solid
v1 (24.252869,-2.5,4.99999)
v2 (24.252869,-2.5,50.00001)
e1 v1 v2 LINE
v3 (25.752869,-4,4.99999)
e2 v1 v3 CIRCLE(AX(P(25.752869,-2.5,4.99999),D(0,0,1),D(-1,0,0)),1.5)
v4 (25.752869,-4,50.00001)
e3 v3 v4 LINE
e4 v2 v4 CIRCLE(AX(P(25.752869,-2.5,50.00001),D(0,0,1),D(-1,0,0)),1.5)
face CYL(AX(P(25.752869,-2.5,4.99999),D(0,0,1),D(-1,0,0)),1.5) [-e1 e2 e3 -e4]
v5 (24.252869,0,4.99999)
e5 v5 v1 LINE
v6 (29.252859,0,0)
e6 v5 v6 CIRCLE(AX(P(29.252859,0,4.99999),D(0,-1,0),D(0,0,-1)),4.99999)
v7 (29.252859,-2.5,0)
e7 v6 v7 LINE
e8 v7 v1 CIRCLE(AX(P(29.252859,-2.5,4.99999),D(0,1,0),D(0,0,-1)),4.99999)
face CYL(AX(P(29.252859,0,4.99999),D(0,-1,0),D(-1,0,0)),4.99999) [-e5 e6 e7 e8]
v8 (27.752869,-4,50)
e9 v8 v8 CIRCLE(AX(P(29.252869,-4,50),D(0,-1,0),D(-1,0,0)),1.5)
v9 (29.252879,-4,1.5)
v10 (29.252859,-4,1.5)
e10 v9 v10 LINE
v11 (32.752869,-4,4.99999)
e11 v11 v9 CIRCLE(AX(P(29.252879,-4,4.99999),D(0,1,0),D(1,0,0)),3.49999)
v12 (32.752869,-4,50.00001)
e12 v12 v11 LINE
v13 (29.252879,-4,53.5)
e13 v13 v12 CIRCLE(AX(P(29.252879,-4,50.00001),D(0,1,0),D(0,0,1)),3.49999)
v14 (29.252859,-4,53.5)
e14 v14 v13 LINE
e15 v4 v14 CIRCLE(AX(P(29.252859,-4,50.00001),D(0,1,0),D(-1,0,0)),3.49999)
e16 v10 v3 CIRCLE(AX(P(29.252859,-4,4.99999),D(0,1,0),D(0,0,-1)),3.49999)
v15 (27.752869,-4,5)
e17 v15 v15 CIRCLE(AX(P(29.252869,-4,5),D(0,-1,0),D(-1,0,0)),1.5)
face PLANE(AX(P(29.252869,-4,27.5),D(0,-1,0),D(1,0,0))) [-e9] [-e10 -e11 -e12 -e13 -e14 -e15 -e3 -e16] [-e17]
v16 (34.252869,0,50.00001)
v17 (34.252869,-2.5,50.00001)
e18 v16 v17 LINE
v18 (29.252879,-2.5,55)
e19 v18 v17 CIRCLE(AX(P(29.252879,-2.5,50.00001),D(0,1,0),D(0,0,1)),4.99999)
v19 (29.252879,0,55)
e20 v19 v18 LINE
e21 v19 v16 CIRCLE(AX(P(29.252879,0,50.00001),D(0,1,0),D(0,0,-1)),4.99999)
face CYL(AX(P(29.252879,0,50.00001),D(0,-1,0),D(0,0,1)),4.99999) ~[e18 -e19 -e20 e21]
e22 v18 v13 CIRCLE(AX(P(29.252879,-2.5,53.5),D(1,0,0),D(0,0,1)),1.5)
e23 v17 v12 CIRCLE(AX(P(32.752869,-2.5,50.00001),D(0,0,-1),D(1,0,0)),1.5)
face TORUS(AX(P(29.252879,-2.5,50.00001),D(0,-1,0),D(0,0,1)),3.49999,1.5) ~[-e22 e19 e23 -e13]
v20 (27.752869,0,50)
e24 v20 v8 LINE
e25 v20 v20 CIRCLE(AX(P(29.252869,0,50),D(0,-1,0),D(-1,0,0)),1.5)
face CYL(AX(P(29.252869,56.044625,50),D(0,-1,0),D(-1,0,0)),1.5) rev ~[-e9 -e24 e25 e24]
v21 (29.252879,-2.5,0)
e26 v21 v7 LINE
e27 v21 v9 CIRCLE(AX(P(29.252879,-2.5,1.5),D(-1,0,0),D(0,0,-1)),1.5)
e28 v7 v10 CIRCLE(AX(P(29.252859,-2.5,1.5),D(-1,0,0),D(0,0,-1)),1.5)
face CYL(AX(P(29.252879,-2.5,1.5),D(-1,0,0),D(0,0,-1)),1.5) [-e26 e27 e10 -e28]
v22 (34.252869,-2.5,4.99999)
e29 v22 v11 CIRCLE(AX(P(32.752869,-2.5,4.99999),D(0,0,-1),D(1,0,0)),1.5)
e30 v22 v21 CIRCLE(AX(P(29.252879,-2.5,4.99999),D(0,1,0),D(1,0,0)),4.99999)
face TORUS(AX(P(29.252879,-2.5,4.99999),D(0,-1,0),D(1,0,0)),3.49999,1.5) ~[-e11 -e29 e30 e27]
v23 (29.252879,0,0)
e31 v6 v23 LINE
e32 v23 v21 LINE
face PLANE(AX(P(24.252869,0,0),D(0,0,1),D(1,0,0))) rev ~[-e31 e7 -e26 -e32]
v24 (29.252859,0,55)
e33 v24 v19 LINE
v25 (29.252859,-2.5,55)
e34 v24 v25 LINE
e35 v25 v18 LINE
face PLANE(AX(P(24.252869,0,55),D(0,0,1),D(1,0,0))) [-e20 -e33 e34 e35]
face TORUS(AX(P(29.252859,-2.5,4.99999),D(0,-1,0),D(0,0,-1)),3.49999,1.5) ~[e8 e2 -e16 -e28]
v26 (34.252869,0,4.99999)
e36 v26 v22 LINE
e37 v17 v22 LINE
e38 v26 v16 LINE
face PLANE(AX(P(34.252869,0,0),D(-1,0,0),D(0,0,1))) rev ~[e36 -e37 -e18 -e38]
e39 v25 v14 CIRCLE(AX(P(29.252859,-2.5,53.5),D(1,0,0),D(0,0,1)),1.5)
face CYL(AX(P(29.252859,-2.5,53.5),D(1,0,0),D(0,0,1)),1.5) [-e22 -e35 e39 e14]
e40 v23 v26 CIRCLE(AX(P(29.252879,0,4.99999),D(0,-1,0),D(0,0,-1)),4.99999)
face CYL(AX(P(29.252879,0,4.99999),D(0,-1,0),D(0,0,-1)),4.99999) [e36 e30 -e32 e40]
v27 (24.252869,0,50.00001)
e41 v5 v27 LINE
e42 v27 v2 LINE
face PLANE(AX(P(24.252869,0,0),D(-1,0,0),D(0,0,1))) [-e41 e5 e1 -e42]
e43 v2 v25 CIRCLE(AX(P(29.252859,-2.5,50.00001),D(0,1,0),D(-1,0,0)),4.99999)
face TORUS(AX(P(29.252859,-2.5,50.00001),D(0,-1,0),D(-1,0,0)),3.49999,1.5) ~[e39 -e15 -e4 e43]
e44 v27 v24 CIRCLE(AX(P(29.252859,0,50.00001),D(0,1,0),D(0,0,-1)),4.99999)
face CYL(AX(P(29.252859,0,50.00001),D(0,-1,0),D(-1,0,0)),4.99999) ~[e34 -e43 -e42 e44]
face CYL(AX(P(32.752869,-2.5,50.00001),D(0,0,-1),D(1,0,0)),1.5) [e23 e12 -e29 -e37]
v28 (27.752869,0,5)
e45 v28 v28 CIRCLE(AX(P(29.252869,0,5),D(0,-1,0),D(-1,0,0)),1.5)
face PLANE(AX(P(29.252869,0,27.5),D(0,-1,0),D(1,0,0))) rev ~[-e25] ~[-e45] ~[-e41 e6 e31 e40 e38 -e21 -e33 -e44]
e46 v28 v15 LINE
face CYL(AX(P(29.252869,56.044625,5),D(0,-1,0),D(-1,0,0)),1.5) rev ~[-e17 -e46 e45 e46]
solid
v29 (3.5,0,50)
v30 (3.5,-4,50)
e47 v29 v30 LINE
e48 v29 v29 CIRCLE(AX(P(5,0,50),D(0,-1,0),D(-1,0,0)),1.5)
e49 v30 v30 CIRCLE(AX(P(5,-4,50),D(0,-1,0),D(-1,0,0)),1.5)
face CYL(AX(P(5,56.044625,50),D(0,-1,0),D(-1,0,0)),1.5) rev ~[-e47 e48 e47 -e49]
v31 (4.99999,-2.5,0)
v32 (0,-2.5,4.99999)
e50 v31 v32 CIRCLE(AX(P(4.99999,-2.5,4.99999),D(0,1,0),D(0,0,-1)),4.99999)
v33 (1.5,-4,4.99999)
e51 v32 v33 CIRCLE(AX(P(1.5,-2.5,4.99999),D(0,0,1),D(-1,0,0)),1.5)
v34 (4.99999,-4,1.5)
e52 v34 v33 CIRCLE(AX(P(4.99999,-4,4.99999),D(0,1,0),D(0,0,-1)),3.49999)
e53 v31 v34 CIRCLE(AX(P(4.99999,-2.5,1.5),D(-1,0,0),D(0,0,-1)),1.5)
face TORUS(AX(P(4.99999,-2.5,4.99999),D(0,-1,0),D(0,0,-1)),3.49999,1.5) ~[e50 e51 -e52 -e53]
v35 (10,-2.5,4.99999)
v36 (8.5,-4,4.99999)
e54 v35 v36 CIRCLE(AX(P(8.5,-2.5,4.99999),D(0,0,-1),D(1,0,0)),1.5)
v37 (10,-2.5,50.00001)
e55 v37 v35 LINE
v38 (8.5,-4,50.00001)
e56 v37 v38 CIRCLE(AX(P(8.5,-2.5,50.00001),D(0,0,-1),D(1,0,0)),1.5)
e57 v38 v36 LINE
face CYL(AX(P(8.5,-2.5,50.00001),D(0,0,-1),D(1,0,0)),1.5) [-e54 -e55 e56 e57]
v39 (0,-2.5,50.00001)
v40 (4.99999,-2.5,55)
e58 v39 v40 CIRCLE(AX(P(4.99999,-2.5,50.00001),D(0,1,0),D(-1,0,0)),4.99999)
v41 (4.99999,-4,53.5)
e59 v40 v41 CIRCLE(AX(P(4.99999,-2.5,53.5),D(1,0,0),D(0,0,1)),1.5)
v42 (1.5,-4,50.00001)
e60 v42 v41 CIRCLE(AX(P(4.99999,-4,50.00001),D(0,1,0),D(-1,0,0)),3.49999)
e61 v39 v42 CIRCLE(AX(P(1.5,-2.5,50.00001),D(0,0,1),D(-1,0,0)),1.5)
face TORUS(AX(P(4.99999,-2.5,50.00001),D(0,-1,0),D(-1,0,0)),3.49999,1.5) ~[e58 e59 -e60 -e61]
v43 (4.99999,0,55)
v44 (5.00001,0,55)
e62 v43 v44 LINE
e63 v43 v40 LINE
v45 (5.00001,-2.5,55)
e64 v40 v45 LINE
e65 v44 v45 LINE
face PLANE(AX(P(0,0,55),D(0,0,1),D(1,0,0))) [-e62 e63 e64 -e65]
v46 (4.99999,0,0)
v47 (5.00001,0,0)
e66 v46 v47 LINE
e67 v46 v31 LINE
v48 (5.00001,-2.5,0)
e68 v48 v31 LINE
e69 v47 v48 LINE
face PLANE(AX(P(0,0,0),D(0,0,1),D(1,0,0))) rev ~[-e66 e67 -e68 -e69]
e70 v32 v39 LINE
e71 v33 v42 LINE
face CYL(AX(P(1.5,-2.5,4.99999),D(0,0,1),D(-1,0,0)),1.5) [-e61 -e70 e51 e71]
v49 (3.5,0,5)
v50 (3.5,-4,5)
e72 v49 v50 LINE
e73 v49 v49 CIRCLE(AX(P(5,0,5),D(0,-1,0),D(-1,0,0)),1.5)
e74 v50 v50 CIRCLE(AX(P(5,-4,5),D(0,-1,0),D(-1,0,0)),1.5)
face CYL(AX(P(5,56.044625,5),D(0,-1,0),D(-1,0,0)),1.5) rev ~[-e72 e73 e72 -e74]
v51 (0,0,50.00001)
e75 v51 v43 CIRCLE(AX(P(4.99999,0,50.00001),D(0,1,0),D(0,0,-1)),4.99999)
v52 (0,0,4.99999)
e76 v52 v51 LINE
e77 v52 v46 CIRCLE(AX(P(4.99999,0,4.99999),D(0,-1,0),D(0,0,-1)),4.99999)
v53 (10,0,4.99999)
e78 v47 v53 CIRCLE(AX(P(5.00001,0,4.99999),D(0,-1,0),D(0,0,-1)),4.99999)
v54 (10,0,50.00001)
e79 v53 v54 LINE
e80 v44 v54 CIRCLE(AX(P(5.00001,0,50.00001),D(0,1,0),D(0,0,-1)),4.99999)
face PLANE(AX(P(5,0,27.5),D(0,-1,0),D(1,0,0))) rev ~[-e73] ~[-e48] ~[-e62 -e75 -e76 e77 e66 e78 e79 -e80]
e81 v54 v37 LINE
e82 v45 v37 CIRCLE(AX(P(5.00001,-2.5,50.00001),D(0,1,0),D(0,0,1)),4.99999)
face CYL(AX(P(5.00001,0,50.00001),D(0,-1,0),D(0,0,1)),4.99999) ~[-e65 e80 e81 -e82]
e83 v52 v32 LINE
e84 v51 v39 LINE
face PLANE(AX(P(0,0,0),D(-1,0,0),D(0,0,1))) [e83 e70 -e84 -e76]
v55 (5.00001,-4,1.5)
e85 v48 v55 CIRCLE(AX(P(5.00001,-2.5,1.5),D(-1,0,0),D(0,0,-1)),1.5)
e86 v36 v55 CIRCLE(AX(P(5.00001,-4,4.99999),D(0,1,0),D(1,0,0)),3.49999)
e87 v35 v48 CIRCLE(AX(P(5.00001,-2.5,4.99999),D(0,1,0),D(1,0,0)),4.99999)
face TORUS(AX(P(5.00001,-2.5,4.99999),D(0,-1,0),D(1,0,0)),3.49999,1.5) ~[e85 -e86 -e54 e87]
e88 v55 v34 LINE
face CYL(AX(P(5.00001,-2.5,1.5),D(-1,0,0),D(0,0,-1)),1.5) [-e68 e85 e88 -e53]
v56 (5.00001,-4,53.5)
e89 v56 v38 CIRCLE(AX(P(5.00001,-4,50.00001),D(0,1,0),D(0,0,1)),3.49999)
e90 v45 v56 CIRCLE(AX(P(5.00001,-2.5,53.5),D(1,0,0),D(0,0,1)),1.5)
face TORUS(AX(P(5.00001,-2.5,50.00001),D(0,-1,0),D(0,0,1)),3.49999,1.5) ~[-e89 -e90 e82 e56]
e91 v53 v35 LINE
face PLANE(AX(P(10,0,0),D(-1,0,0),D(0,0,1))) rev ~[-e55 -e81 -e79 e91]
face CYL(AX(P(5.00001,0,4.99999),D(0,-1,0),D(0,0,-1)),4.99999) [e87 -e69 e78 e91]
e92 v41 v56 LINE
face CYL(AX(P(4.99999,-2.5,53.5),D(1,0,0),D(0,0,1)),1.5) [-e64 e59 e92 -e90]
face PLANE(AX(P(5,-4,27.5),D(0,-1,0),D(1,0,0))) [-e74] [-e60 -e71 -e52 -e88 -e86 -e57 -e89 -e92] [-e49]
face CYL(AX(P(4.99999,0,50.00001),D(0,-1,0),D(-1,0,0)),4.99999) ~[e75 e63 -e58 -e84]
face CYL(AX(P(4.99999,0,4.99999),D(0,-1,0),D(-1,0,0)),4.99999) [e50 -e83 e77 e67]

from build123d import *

# Parameters (mm, degrees)
F0_W     = 10
F0_H     = 55
F1_DEPTH = 4
F3_D     = 3
F3_2_D   = 3
F4_R     = 4.99999
F4_2_R   = 4.99999
F5_R     = 1.5
F5_2_R   = 1.5


# Not quite as in the source:
# - a fillet or chamfer is up to 0.001 mm smaller than in the source, because OpenCascade refuses the exact size


with BuildPart() as f1:
    # F0 (on Front) → F1 (new body)
    with BuildSketch(Plane.XZ):
        with Locations((5, 27.5)):
            Rectangle(F0_W, F0_H)
    extrude(amount=F1_DEPTH)

    # F3 (through all)
    with Locations(Plane(origin=(0, 0, 0), x_dir=(1, 0, 0), z_dir=(0, 1, 0))):
        with Locations((5, -50), (29.2528691568, -50), (5, -5), (29.2528691568, -5)):
            Hole(F3_D / 2)

    # F4 (radius 5 in the source; OpenCascade refuses exactly that, so slightly less here)
    f4_edges = [f1.edges().sort_by_distance(p)[0] for p in [
        (0, -2, 55),
        (0, -2, 0),
        (10, -2, 0),
        (10, -2, 55),
    ]]
    fillet(f4_edges, radius=F4_R)

    # F5
    f5_edges = [f1.edges().sort_by_distance(p)[0] for p in [
        (0, -4, 27.5),
    ]]
    fillet(f5_edges, radius=F5_R)


with BuildPart() as f1b:
    # F0 (on Front) → F1, piece 2 (new body)
    with BuildSketch(Plane.XZ):
        with Locations((29.2528691568, 27.5)):
            Rectangle(F0_W, F0_H)
    extrude(amount=F1_DEPTH)

    # F3#2 (through all)
    with Locations(Plane(origin=(0, 0, 0), x_dir=(1, 0, 0), z_dir=(0, 1, 0))):
        with Locations((5, -50), (29.2528691568, -50), (5, -5), (29.2528691568, -5)):
            Hole(F3_2_D / 2)

    # F4#2 (radius 5 in the source; OpenCascade refuses exactly that, so slightly less here)
    f4_2_edges = [f1b.edges().sort_by_distance(p)[0] for p in [
        (24.252869, -2, 55),
        (24.252869, -2, 0),
        (34.252869, -2, 0),
        (34.252869, -2, 55),
    ]]
    fillet(f4_2_edges, radius=F4_2_R)

    # F5#2
    f5_2_edges = [f1b.edges().sort_by_distance(p)[0] for p in [
        (24.252869, -4, 27.5),
    ]]
    fillet(f5_2_edges, radius=F5_2_R)


solid = Compound([f1.part, f1b.part])
